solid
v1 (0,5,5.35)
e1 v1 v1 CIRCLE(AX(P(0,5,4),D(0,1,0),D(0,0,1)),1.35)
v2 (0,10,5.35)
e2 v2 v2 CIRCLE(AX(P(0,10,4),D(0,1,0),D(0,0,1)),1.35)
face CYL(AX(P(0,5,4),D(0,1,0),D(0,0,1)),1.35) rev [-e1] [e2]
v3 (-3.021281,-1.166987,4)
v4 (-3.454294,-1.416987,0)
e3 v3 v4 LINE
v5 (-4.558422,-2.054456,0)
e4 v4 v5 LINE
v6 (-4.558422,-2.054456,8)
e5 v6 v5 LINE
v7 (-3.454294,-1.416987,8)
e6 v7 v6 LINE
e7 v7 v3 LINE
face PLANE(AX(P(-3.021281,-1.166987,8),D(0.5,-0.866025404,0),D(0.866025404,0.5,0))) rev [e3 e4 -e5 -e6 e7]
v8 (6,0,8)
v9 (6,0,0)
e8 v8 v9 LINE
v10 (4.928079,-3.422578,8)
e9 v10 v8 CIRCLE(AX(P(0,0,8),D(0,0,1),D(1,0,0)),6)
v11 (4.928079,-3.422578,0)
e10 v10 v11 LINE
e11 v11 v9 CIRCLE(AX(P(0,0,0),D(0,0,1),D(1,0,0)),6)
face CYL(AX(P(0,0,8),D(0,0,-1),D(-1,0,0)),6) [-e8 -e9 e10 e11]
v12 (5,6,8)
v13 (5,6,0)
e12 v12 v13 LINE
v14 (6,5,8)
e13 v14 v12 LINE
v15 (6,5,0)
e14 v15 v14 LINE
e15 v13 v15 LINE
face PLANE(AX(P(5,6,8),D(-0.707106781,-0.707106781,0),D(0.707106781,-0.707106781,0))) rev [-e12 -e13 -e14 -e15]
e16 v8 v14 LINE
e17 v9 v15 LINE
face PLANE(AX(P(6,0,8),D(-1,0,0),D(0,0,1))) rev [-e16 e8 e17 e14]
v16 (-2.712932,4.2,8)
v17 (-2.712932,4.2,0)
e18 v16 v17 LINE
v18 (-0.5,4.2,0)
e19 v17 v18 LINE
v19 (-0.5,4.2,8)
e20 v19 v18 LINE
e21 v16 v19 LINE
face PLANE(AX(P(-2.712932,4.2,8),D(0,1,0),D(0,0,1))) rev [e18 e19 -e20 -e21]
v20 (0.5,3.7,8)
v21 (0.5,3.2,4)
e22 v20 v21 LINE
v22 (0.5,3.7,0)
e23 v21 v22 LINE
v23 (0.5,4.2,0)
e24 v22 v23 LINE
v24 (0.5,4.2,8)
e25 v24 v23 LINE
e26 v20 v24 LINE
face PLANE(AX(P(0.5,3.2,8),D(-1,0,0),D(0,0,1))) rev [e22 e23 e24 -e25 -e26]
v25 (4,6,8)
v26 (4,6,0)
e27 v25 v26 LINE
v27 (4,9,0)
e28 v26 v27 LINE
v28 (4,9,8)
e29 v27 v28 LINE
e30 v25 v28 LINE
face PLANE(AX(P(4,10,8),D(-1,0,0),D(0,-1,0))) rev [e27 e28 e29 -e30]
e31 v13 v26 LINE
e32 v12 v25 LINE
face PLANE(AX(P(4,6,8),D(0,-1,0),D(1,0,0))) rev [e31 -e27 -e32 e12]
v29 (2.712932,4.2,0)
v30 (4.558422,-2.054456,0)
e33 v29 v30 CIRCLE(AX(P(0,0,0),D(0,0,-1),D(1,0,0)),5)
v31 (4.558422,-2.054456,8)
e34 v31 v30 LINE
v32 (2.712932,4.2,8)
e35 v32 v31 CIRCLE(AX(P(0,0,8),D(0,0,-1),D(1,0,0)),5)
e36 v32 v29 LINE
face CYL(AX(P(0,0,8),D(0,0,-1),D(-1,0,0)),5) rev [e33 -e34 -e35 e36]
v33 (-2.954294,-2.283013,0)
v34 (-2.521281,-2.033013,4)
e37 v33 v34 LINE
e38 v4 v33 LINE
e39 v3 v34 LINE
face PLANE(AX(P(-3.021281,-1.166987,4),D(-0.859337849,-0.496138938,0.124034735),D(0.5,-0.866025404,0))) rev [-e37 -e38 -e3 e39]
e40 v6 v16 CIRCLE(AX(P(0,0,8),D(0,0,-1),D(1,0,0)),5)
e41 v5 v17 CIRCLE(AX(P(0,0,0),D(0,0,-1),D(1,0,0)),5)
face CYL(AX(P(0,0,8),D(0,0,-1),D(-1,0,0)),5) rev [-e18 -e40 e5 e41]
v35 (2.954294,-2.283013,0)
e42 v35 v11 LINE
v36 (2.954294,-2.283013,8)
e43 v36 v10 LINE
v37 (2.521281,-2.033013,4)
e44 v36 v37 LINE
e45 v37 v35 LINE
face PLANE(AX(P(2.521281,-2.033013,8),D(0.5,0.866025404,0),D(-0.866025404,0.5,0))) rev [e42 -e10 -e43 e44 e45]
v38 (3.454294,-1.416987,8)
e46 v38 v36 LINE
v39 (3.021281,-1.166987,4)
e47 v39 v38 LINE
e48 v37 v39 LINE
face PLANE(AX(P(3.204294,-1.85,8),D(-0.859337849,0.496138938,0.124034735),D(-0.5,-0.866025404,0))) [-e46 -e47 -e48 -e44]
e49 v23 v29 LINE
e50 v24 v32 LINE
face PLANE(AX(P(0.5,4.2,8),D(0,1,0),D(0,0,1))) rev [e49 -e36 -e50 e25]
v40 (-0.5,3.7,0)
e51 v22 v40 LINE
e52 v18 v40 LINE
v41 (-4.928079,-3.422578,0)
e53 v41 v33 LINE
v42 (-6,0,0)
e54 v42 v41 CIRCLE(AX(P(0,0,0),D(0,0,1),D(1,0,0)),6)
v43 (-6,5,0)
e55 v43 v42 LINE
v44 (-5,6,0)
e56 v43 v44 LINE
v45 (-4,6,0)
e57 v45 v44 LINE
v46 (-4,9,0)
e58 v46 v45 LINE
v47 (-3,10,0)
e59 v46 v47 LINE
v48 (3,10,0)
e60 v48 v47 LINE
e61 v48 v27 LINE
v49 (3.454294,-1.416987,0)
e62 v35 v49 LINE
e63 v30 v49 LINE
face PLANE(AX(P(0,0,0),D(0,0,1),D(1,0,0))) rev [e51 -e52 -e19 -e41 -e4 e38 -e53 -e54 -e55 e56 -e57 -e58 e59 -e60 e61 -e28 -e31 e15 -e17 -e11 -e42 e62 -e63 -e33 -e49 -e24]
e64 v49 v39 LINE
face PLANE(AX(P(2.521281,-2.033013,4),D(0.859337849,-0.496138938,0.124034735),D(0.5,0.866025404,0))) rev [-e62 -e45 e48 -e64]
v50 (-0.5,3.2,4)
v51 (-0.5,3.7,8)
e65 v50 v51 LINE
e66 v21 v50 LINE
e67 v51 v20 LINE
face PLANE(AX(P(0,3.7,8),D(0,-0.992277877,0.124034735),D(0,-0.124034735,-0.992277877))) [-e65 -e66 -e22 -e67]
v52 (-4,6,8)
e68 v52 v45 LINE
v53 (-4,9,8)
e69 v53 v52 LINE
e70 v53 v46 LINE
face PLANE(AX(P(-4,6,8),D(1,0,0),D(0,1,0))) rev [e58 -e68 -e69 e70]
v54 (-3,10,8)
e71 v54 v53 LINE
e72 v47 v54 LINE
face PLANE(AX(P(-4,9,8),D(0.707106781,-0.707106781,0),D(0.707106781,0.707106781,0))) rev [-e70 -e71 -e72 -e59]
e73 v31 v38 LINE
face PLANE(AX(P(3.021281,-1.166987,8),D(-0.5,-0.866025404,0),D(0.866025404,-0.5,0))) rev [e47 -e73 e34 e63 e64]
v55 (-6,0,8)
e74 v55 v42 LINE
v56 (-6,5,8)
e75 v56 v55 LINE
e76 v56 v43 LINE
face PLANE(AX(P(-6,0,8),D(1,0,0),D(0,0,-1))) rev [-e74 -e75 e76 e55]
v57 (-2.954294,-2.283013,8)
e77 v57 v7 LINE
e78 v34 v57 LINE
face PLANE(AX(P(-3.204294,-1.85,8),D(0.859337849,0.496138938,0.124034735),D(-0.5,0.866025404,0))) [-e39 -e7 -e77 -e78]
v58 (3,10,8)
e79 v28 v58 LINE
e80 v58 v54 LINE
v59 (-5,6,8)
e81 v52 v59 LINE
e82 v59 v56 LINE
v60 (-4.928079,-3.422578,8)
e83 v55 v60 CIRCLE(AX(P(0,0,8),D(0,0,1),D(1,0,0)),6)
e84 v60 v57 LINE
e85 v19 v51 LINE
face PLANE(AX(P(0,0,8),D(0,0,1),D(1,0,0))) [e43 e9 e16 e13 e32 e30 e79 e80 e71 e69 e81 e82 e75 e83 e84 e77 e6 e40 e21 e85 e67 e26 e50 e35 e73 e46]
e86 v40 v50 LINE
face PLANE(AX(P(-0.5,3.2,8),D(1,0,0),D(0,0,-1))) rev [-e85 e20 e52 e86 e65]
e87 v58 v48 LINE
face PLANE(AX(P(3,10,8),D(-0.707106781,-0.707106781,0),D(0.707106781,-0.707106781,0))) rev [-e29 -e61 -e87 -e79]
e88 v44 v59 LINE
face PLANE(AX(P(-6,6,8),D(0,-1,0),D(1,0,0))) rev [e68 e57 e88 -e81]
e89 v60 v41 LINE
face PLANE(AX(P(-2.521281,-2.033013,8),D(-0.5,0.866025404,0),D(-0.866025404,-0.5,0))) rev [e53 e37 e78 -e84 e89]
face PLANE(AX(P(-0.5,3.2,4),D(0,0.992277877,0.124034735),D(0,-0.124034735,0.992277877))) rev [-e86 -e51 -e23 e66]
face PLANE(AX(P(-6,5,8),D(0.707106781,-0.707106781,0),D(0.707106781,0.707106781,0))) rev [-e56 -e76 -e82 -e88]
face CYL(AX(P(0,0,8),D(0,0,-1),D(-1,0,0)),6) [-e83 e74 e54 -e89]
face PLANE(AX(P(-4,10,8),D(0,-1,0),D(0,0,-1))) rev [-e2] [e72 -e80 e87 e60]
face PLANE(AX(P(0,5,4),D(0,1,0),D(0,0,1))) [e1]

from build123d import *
from OCP.BRepFilletAPI import BRepFilletAPI_MakeChamfer

# Parameters (mm, degrees)
BOSS_EXTRUDE2_DEPTH = 8
SKETCH11_R          = 1.35
CUT_EXTRUDE5_DEPTH  = 5
CHAMFER1_SIZE       = 1
CHAMFER2_SIZE       = 4
CHAMFER2_SIZE_2     = 0.5
CHAMFER3_SIZE       = 0.5
CHAMFER3_SIZE2      = 4


with BuildPart() as part:
    # Sketch1 → Boss-Extrude2 (new body)
    with BuildSketch(Plane.XY):
        with BuildLine():
            Line((-2.712931993, 4.2), (-0.5, 4.2))
            Line((-0.5, 4.2), (-0.5, 3.2))
            Line((-0.5, 3.2), (0.5, 3.2))
            Line((0.5, 3.2), (0.5, 4.2))
            Line((0.5, 4.2), (2.712931993, 4.2))
            ThreePointArc((2.712931993, 4.2), (4.795591913, 1.415025868), (4.558421985, -2.054455891))
            Line((4.558421985, -2.054455891), (3.021281292, -1.166987298))
            Line((3.021281292, -1.166987298), (2.521281292, -2.033012702))
            Line((2.521281292, -2.033012702), (4.928078794, -3.422577888))
            ThreePointArc((4.928078794, -3.422577888), (5.725752036, -1.793255034), (6, 0))
            Line((6, 0), (6, 6))
            Line((6, 6), (4, 6))
            Line((4, 6), (4, 10))
            Line((4, 10), (-4, 10))
            Line((-4, 10), (-4, 6))
            Line((-4, 6), (-6, 6))
            Line((-6, 6), (-6, 0))
            ThreePointArc((-6, 0), (-5.725752036, -1.793255034), (-4.928078794, -3.422577888))
            Line((-4.928078794, -3.422577888), (-2.521281292, -2.033012702))
            Line((-2.521281292, -2.033012702), (-3.021281292, -1.166987298))
            Line((-3.021281292, -1.166987298), (-4.558421985, -2.054455891))
            ThreePointArc((-4.558421985, -2.054455891), (-4.795591913, 1.415025868), (-2.712931993, 4.2))
        make_face()
    extrude(amount=BOSS_EXTRUDE2_DEPTH)

    # Sketch11 → Cut-Extrude5 (cut)
    with BuildSketch(Plane(origin=(0, 10, 0), x_dir=(1, 0, 0), z_dir=(0, 1, 0))):
        with Locations(Location((0, -4, 0), (0, 0, 270))):
            Circle(SKETCH11_R)
    extrude(amount=-CUT_EXTRUDE5_DEPTH, mode=Mode.SUBTRACT)

    # Chamfer1
    chamfer1_edges = [part.edges().sort_by_distance(p)[0] for p in [
        (-6, 6, 4),
        (-4, 10, 4),
        (4, 10, 4),
        (6, 6, 4),
    ]]
    chamfer(chamfer1_edges, length=CHAMFER1_SIZE)

    # Chamfer2
    chamfer2_edges_1 = [part.edges().sort_by_distance(p)[0] for p in [
        (2.771281292, -1.6, 8),
    ]]
    chamfer2_side_1 = [part.faces().sort_by_distance(p)[0] for p in [
        (2.771281292, -1.6, 7.99),
    ]]
    chamfer2_edges_2 = [part.edges().sort_by_distance(p)[0] for p in [
        (2.771281292, -1.6, 0),
    ]]
    chamfer2_side_2 = [part.faces().sort_by_distance(p)[0] for p in [
        (2.779941546, -1.605, 0),
    ]]
    chamfer2_edges_3 = [part.edges().sort_by_distance(p)[0] for p in [
        (0, 3.2, 8),
    ]]
    chamfer2_side_3 = [part.faces().sort_by_distance(p)[0] for p in [
        (0, 3.2, 7.99),
    ]]
    chamfer2_edges_4 = [part.edges().sort_by_distance(p)[0] for p in [
        (-2.771281292, -1.6, 8),
    ]]
    chamfer2_side_4 = [part.faces().sort_by_distance(p)[0] for p in [
        (-2.771281292, -1.6, 7.99),
    ]]
    chamfer2 = BRepFilletAPI_MakeChamfer(part.part.solid().wrapped)
    for e in chamfer2_edges_1:
        chamfer2.Add(CHAMFER2_SIZE - 0.0001, CHAMFER2_SIZE_2 - 0.0001, e.wrapped, chamfer2_side_1[0].wrapped)
    for e in chamfer2_edges_2:
        chamfer2.Add(CHAMFER2_SIZE_2 - 0.0001, CHAMFER2_SIZE - 0.0001, e.wrapped, chamfer2_side_2[0].wrapped)
    for e in chamfer2_edges_3:
        chamfer2.Add(CHAMFER2_SIZE - 0.0001, CHAMFER2_SIZE_2 - 0.0001, e.wrapped, chamfer2_side_3[0].wrapped)
    for e in chamfer2_edges_4:
        chamfer2.Add(CHAMFER2_SIZE - 0.0001, CHAMFER2_SIZE_2 - 0.0001, e.wrapped, chamfer2_side_4[0].wrapped)
    add(Compound.cast(chamfer2.Shape()), mode=Mode.REPLACE)  # a hair under: the kernel refuses the full size

    # Chamfer3
    chamfer3_edges = [part.edges().sort_by_distance(p)[0] for p in [
        (-2.771281292, -1.6, 0),
        (0, 3.2, 0),
    ]]
    chamfer3_side = [part.faces().sort_by_distance(p)[0] for p in [
        (-0.019519244, 4.871717055, 0),
    ]]
    chamfer(chamfer3_edges, length=CHAMFER3_SIZE, length2=CHAMFER3_SIZE2, reference=chamfer3_side[0])


solid = part.part
